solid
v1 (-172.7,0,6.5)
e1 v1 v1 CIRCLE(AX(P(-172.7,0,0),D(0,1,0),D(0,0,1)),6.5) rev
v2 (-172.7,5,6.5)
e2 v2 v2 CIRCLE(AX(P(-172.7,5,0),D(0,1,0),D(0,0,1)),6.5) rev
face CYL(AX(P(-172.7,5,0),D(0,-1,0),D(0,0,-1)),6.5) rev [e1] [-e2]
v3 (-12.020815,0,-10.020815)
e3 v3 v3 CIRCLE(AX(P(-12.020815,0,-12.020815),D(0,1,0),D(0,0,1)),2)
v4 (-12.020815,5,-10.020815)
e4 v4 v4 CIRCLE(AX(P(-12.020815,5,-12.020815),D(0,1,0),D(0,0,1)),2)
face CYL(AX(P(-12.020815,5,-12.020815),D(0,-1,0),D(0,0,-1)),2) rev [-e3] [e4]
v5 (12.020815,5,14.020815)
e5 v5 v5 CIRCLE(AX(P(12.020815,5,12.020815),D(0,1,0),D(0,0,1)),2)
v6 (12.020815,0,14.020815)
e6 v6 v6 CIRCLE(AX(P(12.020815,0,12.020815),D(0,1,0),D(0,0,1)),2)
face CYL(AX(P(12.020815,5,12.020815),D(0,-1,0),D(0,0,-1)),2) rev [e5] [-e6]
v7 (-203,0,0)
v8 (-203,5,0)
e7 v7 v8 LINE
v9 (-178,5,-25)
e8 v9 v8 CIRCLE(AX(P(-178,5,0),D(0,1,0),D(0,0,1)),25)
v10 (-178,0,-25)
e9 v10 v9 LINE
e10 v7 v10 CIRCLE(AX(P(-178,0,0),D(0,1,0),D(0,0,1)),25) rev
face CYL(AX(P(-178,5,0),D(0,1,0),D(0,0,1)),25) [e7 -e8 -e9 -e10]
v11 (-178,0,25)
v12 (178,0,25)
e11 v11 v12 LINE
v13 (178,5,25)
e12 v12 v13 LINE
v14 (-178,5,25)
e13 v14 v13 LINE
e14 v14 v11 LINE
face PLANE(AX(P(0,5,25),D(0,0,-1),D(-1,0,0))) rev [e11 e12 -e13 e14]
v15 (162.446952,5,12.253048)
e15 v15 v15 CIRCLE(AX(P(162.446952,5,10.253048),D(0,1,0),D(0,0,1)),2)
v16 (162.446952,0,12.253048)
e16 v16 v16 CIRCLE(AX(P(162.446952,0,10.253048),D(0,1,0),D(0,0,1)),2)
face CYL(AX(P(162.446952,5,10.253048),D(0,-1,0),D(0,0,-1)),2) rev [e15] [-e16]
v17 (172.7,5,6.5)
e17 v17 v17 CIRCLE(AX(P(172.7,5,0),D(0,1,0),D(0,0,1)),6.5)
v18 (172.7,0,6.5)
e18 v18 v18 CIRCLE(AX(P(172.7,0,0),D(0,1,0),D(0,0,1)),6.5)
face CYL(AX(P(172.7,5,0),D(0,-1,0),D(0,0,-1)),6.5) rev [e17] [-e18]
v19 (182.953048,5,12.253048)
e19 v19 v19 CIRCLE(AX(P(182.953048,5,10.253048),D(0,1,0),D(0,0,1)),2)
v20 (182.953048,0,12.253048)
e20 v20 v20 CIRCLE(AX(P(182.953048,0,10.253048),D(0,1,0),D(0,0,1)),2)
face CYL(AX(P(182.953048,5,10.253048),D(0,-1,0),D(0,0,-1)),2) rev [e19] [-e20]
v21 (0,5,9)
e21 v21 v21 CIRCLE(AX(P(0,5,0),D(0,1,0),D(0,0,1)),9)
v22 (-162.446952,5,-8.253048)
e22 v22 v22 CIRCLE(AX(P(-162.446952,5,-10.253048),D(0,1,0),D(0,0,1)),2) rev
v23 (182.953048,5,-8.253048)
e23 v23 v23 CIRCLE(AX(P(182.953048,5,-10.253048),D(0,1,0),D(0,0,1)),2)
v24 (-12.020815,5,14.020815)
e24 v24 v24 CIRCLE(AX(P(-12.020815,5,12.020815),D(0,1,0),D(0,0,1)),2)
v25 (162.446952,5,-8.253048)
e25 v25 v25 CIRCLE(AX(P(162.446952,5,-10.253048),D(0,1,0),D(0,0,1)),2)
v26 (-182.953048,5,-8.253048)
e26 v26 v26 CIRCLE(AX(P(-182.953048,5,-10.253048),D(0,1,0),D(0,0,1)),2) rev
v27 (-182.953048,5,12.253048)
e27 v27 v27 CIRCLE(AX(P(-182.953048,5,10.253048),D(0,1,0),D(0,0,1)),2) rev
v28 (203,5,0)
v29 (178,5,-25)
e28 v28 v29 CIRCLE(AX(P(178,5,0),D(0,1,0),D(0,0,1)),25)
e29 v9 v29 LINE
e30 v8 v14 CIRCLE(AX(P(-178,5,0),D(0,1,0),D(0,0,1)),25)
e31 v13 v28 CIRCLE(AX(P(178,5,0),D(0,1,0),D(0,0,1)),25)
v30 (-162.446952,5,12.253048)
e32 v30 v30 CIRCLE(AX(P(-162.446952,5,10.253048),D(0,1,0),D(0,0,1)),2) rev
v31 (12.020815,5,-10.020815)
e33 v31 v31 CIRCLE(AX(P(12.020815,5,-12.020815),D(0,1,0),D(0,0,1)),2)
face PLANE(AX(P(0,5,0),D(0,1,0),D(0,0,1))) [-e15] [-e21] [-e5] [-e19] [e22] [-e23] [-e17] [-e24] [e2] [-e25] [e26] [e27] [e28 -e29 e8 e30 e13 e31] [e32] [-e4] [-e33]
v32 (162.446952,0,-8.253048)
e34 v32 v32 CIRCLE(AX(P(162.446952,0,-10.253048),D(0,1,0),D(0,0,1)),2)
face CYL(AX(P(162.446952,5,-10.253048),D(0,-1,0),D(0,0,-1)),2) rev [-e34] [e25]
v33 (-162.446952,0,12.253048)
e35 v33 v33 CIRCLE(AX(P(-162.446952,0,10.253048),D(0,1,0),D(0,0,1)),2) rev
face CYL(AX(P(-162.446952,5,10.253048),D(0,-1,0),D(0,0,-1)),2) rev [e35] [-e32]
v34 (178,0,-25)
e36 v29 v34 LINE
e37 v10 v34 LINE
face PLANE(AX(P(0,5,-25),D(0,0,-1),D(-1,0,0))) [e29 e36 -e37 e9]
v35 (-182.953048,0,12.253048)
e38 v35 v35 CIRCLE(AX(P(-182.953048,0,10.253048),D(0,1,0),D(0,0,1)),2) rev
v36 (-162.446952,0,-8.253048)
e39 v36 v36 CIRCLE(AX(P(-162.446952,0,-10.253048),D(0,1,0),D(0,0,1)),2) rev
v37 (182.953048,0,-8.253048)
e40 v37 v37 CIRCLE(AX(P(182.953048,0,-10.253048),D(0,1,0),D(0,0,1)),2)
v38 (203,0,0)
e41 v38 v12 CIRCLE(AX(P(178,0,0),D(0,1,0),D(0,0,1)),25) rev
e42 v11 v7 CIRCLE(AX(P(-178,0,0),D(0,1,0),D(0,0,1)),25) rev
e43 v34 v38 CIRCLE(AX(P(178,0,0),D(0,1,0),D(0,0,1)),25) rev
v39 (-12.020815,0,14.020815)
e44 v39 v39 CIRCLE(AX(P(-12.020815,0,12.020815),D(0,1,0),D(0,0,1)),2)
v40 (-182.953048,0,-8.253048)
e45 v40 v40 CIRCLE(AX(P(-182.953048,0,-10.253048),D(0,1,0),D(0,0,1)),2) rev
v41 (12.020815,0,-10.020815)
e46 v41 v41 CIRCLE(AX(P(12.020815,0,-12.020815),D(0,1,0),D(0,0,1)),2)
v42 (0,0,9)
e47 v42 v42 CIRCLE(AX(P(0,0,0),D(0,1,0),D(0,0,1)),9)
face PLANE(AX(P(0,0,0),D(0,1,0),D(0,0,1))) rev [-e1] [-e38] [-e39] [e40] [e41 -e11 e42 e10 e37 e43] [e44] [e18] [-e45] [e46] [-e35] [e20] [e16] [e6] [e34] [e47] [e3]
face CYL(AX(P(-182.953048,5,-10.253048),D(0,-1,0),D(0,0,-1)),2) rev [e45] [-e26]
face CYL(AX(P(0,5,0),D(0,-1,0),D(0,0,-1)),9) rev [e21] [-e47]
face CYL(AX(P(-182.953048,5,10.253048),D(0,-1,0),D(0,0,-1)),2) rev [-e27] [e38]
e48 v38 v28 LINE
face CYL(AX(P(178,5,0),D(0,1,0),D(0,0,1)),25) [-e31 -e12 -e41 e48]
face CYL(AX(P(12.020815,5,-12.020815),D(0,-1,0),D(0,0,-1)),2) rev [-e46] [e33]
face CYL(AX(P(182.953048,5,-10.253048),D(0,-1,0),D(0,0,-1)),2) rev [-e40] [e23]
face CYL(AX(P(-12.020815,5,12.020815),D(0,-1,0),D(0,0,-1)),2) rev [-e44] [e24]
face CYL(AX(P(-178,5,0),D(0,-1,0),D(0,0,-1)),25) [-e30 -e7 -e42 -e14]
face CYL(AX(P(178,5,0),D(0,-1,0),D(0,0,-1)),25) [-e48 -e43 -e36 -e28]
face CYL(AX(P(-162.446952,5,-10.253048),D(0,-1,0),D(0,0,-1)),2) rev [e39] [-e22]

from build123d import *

# Parameters (mm, degrees)
SKETCH_1_W      = 406
SKETCH_1_H      = 50
SKETCH_1_R      = 6.5
SKETCH_1_R_2    = 9
SKETCH_1_R_3    = 2
EXTRUDE_1_DEPTH = 5
FILLET_1_R      = 25


with BuildPart() as part:
    # ｽｹｯﾁ1 → ﾎﾞｽ - 押し出し1 (new body)
    with BuildSketch(Plane(origin=(0, 0, 0), x_dir=(1, 0, 0), z_dir=(0, 1, 0))):
        Rectangle(SKETCH_1_W, SKETCH_1_H)
        with Locations(Location((172.7, 0, 0), (0, 0, 270))):
            Circle(SKETCH_1_R, mode=Mode.SUBTRACT)
        with Locations(Location((-172.7, 0, 0), (0, 0, 270))):
            Circle(SKETCH_1_R, mode=Mode.SUBTRACT)
        with Locations(Location((0, 0, 0), (0, 0, 270))):
            Circle(SKETCH_1_R_2, mode=Mode.SUBTRACT)
        with Locations(Location((12.02081528, 12.02081528, 0), (0, 0, 270))):
            Circle(SKETCH_1_R_3, mode=Mode.SUBTRACT)
        with Locations(Location((12.02081528, -12.02081528, 0), (0, 0, 270))):
            Circle(SKETCH_1_R_3, mode=Mode.SUBTRACT)
        with Locations(Location((-182.953048327, 10.253048327, 0), (0, 0, 270))):
            Circle(SKETCH_1_R_3, mode=Mode.SUBTRACT)
        with Locations(Location((182.953048327, 10.253048327, 0), (0, 0, 270))):
            Circle(SKETCH_1_R_3, mode=Mode.SUBTRACT)
        with Locations(Location((-182.953048327, -10.253048327, 0), (0, 0, 270))):
            Circle(SKETCH_1_R_3, mode=Mode.SUBTRACT)
        with Locations(Location((182.953048327, -10.253048327, 0), (0, 0, 270))):
            Circle(SKETCH_1_R_3, mode=Mode.SUBTRACT)
        with Locations(Location((-162.446951673, -10.253048327, 0), (0, 0, 270))):
            Circle(SKETCH_1_R_3, mode=Mode.SUBTRACT)
        with Locations(Location((-162.446951673, 10.253048327, 0), (0, 0, 270))):
            Circle(SKETCH_1_R_3, mode=Mode.SUBTRACT)
        with Locations(Location((-12.02081528, -12.02081528, 0), (0, 0, 270))):
            Circle(SKETCH_1_R_3, mode=Mode.SUBTRACT)
        with Locations(Location((162.446951673, -10.253048327, 0), (0, 0, 270))):
            Circle(SKETCH_1_R_3, mode=Mode.SUBTRACT)
        with Locations(Location((-12.02081528, 12.02081528, 0), (0, 0, 270))):
            Circle(SKETCH_1_R_3, mode=Mode.SUBTRACT)
        with Locations(Location((162.446951673, 10.253048327, 0), (0, 0, 270))):
            Circle(SKETCH_1_R_3, mode=Mode.SUBTRACT)
    extrude(amount=EXTRUDE_1_DEPTH)

    # ﾌｨﾚｯﾄ1
    fillet_1_edges = [part.edges().sort_by_distance(p)[0] for p in [
        (-203, 2.5, -25),
        (-203, 2.5, 25),
        (203, 2.5, 25),
        (203, 2.5, -25),
    ]]
    fillet(fillet_1_edges, radius=FILLET_1_R - 0.0001)  # a hair under: the kernel refuses the full size


solid = part.part
